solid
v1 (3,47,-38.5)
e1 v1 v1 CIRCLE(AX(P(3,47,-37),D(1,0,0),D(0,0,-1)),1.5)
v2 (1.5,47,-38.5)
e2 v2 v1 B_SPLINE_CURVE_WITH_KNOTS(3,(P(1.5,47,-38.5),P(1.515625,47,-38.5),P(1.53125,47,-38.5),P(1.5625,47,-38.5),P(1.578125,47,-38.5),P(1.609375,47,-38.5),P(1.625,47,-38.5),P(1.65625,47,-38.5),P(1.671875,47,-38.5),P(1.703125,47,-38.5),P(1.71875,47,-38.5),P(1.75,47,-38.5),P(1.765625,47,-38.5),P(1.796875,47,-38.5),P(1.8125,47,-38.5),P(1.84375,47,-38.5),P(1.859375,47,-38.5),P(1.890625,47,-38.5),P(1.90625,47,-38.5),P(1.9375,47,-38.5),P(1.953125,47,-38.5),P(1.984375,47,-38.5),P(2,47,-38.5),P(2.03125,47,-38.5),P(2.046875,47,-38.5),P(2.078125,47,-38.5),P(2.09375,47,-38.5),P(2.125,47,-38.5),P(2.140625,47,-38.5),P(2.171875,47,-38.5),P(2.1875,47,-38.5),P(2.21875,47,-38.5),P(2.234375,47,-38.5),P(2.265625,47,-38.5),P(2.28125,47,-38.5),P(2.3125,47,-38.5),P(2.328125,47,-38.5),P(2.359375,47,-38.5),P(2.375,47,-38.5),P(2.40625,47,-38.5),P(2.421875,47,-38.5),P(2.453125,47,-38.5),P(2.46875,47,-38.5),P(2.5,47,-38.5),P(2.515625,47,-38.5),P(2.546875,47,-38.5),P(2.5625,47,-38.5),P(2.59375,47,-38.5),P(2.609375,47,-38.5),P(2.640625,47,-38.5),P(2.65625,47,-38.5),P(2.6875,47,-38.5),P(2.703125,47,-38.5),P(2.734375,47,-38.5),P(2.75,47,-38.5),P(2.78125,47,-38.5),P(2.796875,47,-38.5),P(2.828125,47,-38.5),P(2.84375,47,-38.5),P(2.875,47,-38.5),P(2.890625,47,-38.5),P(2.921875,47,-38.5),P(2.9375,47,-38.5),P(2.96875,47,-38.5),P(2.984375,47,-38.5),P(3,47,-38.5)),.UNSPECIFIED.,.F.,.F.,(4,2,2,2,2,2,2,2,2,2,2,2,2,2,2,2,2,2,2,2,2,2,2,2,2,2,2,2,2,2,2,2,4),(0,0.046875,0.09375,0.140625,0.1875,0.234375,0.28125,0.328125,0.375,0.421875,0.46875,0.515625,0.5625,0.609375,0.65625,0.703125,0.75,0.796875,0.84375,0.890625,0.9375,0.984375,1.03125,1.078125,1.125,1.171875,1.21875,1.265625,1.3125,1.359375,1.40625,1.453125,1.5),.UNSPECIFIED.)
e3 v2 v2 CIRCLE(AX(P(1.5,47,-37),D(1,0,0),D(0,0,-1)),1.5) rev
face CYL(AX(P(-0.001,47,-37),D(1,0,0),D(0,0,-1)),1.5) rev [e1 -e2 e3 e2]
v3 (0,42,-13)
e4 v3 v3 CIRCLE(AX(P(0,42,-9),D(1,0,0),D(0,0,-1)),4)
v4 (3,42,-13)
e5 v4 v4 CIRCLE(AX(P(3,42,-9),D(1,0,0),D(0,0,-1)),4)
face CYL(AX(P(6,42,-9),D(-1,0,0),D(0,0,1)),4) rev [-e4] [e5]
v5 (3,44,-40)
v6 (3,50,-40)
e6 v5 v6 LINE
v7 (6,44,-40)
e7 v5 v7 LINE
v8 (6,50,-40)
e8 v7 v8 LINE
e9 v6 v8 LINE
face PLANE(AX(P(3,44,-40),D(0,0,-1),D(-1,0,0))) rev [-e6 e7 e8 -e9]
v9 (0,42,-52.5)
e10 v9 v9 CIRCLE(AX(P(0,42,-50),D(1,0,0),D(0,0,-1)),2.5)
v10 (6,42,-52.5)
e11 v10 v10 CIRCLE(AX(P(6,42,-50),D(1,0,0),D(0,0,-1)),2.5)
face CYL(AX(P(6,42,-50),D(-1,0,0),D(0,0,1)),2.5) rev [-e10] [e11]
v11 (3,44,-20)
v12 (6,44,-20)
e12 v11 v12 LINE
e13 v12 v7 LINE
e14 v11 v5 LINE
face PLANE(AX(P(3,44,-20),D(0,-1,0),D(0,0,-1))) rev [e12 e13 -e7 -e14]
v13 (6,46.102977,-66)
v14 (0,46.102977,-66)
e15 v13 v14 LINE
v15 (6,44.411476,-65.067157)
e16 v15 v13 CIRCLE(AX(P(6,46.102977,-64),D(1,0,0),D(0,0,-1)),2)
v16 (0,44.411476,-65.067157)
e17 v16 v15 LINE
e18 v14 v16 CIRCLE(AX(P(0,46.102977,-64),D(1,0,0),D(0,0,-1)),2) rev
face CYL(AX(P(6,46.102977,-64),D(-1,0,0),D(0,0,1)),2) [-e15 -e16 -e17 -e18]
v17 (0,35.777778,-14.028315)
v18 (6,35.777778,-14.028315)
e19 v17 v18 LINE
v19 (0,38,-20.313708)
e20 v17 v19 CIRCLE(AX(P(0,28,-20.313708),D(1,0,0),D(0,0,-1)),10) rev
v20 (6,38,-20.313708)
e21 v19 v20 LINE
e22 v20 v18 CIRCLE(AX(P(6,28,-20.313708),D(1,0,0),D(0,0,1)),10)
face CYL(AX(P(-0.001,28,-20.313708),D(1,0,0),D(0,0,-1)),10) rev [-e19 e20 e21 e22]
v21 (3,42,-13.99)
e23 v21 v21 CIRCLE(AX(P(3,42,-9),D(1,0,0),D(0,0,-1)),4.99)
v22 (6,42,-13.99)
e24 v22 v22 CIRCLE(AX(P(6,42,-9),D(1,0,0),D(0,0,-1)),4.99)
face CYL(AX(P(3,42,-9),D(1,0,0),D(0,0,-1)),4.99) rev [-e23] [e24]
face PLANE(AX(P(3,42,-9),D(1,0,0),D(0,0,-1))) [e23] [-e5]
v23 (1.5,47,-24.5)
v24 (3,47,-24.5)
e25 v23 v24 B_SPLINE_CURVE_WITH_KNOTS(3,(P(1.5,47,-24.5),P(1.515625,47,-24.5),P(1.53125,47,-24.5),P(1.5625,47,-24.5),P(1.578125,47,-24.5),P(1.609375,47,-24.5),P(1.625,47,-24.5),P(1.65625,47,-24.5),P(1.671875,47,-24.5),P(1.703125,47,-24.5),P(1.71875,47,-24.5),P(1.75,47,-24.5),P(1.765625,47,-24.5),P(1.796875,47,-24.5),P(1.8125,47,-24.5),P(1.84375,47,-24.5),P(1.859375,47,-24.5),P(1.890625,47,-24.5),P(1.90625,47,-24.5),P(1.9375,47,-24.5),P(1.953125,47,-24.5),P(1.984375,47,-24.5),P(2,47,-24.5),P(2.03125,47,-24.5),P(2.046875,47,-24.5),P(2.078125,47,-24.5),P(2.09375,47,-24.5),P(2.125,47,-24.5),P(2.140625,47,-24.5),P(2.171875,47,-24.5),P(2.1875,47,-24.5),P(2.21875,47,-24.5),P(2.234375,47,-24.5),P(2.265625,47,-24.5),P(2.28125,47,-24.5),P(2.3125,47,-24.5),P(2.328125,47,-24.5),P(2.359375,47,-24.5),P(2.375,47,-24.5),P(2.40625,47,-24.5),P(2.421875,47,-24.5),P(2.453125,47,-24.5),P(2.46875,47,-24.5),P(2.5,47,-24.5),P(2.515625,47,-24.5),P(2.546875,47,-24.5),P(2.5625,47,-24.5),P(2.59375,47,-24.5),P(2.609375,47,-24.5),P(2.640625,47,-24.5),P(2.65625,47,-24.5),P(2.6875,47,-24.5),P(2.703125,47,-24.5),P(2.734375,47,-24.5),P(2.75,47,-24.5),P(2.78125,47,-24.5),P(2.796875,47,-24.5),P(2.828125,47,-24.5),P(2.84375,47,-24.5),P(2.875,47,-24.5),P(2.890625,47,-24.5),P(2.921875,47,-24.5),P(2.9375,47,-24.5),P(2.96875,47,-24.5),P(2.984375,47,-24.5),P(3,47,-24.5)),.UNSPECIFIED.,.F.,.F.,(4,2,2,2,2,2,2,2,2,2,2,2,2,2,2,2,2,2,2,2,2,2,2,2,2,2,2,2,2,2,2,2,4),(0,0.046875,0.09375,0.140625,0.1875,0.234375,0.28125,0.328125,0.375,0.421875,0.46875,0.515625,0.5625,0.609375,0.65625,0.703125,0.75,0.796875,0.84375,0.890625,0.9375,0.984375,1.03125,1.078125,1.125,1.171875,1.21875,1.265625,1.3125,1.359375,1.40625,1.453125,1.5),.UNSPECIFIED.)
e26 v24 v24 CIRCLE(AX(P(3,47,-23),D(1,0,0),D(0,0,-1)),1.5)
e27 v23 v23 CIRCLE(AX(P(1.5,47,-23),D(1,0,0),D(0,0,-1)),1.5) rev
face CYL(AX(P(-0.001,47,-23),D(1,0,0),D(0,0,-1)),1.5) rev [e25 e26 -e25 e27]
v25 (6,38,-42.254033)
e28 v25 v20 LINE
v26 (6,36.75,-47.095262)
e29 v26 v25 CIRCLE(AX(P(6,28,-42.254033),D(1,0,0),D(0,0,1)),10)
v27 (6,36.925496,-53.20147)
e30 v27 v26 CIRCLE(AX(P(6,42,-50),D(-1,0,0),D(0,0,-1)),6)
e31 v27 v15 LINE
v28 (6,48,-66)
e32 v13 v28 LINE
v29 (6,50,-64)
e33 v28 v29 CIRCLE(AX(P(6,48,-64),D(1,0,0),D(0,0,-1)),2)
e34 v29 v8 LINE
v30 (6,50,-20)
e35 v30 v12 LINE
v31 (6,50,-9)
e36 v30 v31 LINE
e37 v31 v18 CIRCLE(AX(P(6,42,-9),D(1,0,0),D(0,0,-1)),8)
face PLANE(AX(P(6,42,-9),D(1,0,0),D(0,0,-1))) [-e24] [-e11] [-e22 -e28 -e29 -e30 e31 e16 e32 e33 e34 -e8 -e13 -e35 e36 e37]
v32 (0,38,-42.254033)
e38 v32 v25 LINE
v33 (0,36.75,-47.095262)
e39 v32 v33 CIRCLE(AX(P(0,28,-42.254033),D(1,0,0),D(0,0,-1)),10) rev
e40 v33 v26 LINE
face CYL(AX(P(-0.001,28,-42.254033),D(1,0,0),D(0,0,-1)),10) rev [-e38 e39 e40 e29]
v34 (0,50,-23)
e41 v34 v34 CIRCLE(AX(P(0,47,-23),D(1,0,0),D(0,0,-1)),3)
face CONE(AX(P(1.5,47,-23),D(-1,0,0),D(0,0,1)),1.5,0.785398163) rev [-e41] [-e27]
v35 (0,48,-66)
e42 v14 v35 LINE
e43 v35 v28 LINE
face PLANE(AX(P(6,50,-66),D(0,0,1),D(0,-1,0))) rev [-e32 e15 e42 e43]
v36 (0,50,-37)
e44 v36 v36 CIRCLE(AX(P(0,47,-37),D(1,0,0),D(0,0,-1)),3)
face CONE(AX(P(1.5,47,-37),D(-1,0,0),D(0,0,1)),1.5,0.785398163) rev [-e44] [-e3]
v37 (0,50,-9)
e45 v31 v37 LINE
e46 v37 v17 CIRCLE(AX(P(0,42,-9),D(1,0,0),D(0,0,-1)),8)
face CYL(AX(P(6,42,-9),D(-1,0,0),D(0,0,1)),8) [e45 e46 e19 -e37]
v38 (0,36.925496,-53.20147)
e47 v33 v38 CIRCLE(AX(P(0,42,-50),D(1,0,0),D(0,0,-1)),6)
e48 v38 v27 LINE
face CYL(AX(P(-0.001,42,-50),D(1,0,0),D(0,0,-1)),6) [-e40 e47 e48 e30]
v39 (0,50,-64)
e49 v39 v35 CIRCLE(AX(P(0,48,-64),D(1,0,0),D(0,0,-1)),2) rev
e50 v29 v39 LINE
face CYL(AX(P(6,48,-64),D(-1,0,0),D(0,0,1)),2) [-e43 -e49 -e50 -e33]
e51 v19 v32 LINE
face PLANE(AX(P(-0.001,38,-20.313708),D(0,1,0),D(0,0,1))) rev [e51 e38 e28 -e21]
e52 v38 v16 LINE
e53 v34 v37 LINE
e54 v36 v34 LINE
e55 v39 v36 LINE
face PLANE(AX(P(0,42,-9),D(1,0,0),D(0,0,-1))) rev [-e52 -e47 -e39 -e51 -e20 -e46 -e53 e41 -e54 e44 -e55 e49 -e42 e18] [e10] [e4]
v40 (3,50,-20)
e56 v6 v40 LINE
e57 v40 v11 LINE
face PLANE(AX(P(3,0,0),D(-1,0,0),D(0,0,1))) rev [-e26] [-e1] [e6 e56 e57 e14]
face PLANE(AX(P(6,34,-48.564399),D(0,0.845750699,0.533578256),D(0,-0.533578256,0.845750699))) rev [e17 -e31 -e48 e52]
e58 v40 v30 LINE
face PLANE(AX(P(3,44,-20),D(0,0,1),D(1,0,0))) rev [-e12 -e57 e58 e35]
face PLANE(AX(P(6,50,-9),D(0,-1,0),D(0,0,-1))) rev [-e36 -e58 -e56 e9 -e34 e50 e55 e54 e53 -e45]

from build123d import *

# Parameters (mm, degrees)
SKETCH27_R          = 4
SKETCH27_R_2        = 2.5
BOSS_EXTRUDE1_DEPTH = 6
SKETCH33_R          = 4.99
CUT_EXTRUDE2_DEPTH  = 3
SKETCH34_W          = 20
SKETCH34_H          = 6
CUT_EXTRUDE3_DEPTH  = 3
CUT_EXTRUDE5_REACH  = 84.855
SKETCH36_R          = 1.5
FILLET3_R           = 2
FILLET4_R           = 10
CUT_EXTRUDE6_REACH  = 85.018
CHAMFER1_SIZE       = 1.5


with BuildPart() as part:
    # Sketch27 → Boss-Extrude1 (new body)
    with BuildSketch(Plane(origin=(0, 0, 0), x_dir=(0, 0, -1), z_dir=(1, 0, 0))):
        with BuildLine():
            Line((9, 50), (66, 50))
            Line((66, 50), (66, 45))
            Line((66, 45), (48.564398788, 34))
            Line((48.564398788, 34), (9, 34))
            ThreePointArc((9, 34), (1, 42), (9, 50))
        make_face()
        with Locations((9, 42)):
            Circle(SKETCH27_R, mode=Mode.SUBTRACT)
        with Locations((50, 42)):
            Circle(SKETCH27_R_2, mode=Mode.SUBTRACT)
    extrude(amount=BOSS_EXTRUDE1_DEPTH)

    # Sketch33 → Cut-Extrude2 (cut)
    with BuildSketch(Plane(origin=(6, 0, 0), x_dir=(0, 0, -1), z_dir=(1, 0, 0))):
        with Locations((9, 42)):
            Circle(SKETCH33_R)
    extrude(amount=-CUT_EXTRUDE2_DEPTH, mode=Mode.SUBTRACT)

    # Sketch34 → Cut-Extrude3 (cut)
    with BuildSketch(Plane(origin=(6, 0, 0), x_dir=(0, 0, -1), z_dir=(1, 0, 0))):
        with Locations((30, 47)):
            Rectangle(SKETCH34_W, SKETCH34_H)
    extrude(amount=-CUT_EXTRUDE3_DEPTH, mode=Mode.SUBTRACT)

    # Sketch36 → Cut-Extrude5 (cut, up to next)
    with BuildSketch(Plane(origin=(3, 0, 0), x_dir=(0, 0, -1), z_dir=(1, 0, 0)), mode=Mode.PRIVATE) as cut_extrude5_sk1:
        with Locations((23, 47)):
            Circle(SKETCH36_R)
    cut_extrude5_tool1 = extrude(cut_extrude5_sk1.sketch, amount=-CUT_EXTRUDE5_REACH, mode=Mode.PRIVATE) & part.part
    # Sketch36 → Cut-Extrude5 (cut, up to next)
    with BuildSketch(Plane(origin=(3, 0, 0), x_dir=(0, 0, -1), z_dir=(1, 0, 0)), mode=Mode.PRIVATE) as cut_extrude5_sk2:
        with Locations((37, 47)):
            Circle(SKETCH36_R)
    cut_extrude5_tool2 = extrude(cut_extrude5_sk2.sketch, amount=-CUT_EXTRUDE5_REACH, mode=Mode.PRIVATE) & part.part
    add(cut_extrude5_tool1.solids().sort_by_distance((3, 47, -23))[0], mode=Mode.SUBTRACT)
    add(cut_extrude5_tool2.solids().sort_by_distance((3, 47, -37))[0], mode=Mode.SUBTRACT)

    # Fillet3
    fillet3_edges = [part.edges().sort_by_distance(p)[0] for p in [
        (3, 50, -66),
        (3, 45, -66),
    ]]
    fillet(fillet3_edges, radius=FILLET3_R)

    # Fillet4
    fillet4_edges = [part.edges().sort_by_distance(p)[0] for p in [
        (3, 34, -48.564398788),
    ]]
    fillet(fillet4_edges, radius=FILLET4_R)

    # Sketch37 → Cut-Extrude6 (cut, up to next)
    with BuildSketch(Plane(origin=(6, 0, 0), x_dir=(0, 0, -1), z_dir=(1, 0, 0)), mode=Mode.PRIVATE) as cut_extrude6_sk1:
        with BuildLine():
            Line((20.313708499, 38), (42.254033308, 38))
            ThreePointArc((42.254033308, 38), (44.754033308, 37.682458366), (47.09526249, 36.75))
            ThreePointArc((47.09526249, 36.75), (50.17237218, 36.002476525), (53.201469536, 36.925495807))
            Line((53.201469536, 36.925495807), (53.201469536, 34))
            Line((53.201469536, 34), (9, 34))
            ThreePointArc((9, 34), (11.666666667, 34.457527667), (14.028314888, 35.777777778))
            ThreePointArc((14.028314888, 35.777777778), (16.980375166, 37.428090416), (20.313708499, 38))
        make_face()
    cut_extrude6_tool1 = extrude(cut_extrude6_sk1.sketch, amount=-CUT_EXTRUDE6_REACH, mode=Mode.PRIVATE) & part.part
    add(cut_extrude6_tool1.solids().sort_by_distance((6, 35.823598, -32.372789))[0], mode=Mode.SUBTRACT)

    # Chamfer1
    chamfer1_edges = [part.edges().sort_by_distance(p)[0] for p in [
        (0, 47, -21.5),
        (0, 47, -35.5),
    ]]
    chamfer(chamfer1_edges, length=CHAMFER1_SIZE - 0.0001)  # a hair under: the kernel refuses the full size


solid = part.part
